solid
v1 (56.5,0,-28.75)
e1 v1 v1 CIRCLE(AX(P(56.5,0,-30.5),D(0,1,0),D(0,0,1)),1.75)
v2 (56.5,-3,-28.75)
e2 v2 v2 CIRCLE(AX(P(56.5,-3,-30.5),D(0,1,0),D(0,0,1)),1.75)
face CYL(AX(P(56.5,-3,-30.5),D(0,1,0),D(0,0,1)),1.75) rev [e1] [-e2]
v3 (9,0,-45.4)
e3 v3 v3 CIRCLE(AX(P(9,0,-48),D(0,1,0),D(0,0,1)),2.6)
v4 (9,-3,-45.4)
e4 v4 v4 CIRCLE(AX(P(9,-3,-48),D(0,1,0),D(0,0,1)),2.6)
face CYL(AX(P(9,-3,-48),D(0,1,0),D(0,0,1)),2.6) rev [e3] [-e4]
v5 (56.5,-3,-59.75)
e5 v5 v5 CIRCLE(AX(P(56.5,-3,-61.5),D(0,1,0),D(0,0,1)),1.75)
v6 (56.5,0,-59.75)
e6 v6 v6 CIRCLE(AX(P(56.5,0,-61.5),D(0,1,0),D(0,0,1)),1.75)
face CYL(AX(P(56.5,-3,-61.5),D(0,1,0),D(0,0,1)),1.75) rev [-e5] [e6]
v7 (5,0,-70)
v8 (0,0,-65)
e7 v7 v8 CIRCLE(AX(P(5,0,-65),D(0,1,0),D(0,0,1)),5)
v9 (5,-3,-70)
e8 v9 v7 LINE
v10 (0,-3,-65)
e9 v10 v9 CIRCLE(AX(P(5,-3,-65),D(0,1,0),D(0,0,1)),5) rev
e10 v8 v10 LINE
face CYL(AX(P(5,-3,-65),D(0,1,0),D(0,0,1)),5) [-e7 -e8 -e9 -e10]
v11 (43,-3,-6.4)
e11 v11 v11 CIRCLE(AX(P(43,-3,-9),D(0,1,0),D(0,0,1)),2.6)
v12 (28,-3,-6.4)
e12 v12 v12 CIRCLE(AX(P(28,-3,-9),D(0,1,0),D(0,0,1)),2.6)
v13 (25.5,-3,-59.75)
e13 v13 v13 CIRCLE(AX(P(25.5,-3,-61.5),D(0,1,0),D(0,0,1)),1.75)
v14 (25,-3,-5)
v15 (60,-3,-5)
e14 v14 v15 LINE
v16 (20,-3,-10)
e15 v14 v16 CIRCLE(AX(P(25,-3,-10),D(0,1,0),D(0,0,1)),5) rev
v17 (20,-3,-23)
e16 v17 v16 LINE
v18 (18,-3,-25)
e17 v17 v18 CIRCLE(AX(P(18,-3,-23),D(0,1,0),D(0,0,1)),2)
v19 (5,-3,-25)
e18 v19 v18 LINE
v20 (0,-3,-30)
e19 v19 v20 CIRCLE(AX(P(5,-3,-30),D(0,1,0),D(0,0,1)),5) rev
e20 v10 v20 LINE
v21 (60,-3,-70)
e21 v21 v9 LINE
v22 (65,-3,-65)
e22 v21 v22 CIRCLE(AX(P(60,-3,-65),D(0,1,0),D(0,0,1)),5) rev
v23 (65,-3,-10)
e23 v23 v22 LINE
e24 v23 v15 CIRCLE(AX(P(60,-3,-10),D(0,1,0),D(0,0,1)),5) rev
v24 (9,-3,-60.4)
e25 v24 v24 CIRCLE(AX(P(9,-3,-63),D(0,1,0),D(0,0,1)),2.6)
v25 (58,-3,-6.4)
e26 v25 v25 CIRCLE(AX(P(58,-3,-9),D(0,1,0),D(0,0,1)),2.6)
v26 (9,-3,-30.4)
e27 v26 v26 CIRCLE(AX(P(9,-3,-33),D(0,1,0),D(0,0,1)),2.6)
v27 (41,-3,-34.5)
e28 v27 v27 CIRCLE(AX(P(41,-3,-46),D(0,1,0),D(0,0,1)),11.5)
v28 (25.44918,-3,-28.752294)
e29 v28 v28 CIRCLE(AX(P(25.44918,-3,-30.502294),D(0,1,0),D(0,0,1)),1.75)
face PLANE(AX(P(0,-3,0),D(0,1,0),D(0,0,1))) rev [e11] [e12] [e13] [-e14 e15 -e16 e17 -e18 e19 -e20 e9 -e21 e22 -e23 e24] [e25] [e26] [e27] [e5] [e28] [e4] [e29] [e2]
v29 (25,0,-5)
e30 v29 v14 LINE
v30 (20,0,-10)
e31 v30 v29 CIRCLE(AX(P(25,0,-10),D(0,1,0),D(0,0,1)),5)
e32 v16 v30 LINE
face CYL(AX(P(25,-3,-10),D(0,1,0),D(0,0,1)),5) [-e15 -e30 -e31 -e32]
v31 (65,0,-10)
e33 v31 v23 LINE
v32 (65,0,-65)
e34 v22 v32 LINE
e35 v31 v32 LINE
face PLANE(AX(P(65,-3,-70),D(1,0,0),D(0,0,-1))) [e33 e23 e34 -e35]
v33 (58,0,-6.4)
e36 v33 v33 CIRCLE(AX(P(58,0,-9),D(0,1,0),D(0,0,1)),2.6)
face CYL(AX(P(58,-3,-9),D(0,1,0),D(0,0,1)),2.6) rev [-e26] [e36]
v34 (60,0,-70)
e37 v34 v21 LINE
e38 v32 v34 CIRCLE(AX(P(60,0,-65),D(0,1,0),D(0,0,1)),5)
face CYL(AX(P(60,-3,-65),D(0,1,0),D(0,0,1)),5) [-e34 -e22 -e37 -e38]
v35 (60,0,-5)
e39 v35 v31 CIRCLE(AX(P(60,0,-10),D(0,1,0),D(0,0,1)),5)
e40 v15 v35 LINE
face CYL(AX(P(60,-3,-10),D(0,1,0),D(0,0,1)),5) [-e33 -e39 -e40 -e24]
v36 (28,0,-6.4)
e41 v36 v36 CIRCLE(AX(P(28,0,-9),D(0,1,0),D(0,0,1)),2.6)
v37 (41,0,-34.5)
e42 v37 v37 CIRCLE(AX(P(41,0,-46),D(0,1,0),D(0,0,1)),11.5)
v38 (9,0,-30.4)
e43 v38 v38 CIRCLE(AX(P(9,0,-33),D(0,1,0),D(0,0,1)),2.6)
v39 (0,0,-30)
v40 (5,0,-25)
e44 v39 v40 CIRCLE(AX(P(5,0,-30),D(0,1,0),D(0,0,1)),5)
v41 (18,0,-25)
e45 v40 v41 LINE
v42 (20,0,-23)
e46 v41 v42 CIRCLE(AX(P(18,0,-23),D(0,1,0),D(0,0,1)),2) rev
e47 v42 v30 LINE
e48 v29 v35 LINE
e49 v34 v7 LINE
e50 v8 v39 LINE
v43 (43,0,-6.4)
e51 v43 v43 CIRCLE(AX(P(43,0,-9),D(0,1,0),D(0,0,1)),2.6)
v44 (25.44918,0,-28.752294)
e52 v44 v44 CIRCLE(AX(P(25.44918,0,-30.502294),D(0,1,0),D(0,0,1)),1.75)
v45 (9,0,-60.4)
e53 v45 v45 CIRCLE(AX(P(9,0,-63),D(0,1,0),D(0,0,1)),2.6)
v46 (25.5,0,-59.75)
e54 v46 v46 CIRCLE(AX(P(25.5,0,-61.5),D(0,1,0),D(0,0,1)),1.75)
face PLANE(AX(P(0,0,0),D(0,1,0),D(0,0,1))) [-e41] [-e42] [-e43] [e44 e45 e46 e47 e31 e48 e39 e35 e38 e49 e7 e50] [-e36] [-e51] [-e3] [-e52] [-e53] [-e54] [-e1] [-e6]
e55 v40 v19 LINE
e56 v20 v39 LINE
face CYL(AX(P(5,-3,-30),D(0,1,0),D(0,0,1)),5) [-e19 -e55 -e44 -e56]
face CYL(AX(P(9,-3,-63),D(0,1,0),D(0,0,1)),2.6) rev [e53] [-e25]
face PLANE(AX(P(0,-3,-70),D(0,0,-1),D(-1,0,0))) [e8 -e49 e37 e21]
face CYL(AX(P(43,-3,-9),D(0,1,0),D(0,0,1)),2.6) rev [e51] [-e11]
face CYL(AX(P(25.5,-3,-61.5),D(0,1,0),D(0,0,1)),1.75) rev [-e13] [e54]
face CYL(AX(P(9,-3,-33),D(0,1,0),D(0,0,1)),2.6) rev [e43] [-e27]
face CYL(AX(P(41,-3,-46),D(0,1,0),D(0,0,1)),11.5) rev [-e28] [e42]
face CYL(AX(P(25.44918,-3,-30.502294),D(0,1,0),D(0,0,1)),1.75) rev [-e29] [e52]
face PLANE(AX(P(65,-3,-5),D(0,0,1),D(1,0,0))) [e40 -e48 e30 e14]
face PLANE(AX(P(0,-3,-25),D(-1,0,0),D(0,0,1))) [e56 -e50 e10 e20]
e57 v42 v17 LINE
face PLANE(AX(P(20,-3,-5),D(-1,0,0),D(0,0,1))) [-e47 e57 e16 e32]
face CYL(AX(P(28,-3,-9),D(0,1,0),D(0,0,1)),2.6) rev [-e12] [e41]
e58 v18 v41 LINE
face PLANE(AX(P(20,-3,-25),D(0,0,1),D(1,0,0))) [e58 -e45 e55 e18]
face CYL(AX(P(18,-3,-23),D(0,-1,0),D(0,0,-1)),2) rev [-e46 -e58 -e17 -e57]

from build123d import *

# Parameters (mm, degrees)
SKETCH2_R          = 2.6
SKETCH2_R_2        = 1.75
SKETCH2_R_3        = 11.5
BASE_FLANGE1_DEPTH = 3
FILLET1_R          = 5
FILLET2_R          = 2


# Sheet-metal steps are written as plain solids
with BuildPart() as part:
    # Sketch2 → Base-Flange1 (new body)
    with BuildSketch(Plane(origin=(0, 0, 0), x_dir=(1, 0, 0), z_dir=(0, 1, 0))):
        Polygon((0, 70), (65, 70), (65, 5), (20, 5), (20, 25), (0, 25), align=None)
        with Locations(Location((28, 9, 0), (0, 0, 270))):
            Circle(SKETCH2_R, mode=Mode.SUBTRACT)
        with Locations(Location((43, 9, 0), (0, 0, 270))):
            Circle(SKETCH2_R, mode=Mode.SUBTRACT)
        with Locations(Location((58, 9, 0), (0, 0, 270))):
            Circle(SKETCH2_R, mode=Mode.SUBTRACT)
        with Locations(Location((9, 33, 0), (0, 0, 270))):
            Circle(SKETCH2_R, mode=Mode.SUBTRACT)
        with Locations(Location((9, 48, 0), (0, 0, 270))):
            Circle(SKETCH2_R, mode=Mode.SUBTRACT)
        with Locations(Location((9, 63, 0), (0, 0, 270))):
            Circle(SKETCH2_R, mode=Mode.SUBTRACT)
        with Locations(Location((25.5, 61.5, 0), (0, 0, 270))):
            Circle(SKETCH2_R_2, mode=Mode.SUBTRACT)
        with Locations(Location((56.5, 61.5, 0), (0, 0, 270))):
            Circle(SKETCH2_R_2, mode=Mode.SUBTRACT)
        with Locations(Location((56.5, 30.5, 0), (0, 0, 270))):
            Circle(SKETCH2_R_2, mode=Mode.SUBTRACT)
        with Locations(Location((25.44917982, 30.502293897, 0), (0, 0, 270))):
            Circle(SKETCH2_R_2, mode=Mode.SUBTRACT)
        with Locations(Location((41, 46, 0), (0, 0, 270))):
            Circle(SKETCH2_R_3, mode=Mode.SUBTRACT)
    extrude(amount=-BASE_FLANGE1_DEPTH)

    # Fillet1
    fillet1_edges = [part.edges().sort_by_distance(p)[0] for p in [
        (0, -1.5, -25),
        (0, -1.5, -70),
        (65, -1.5, -70),
        (65, -1.5, -5),
        (20, -1.5, -5),
    ]]
    fillet(fillet1_edges, radius=FILLET1_R)

    # Fillet2
    fillet2_edges = [part.edges().sort_by_distance(p)[0] for p in [
        (20, -1.5, -25),
    ]]
    fillet(fillet2_edges, radius=FILLET2_R)


solid = part.part
